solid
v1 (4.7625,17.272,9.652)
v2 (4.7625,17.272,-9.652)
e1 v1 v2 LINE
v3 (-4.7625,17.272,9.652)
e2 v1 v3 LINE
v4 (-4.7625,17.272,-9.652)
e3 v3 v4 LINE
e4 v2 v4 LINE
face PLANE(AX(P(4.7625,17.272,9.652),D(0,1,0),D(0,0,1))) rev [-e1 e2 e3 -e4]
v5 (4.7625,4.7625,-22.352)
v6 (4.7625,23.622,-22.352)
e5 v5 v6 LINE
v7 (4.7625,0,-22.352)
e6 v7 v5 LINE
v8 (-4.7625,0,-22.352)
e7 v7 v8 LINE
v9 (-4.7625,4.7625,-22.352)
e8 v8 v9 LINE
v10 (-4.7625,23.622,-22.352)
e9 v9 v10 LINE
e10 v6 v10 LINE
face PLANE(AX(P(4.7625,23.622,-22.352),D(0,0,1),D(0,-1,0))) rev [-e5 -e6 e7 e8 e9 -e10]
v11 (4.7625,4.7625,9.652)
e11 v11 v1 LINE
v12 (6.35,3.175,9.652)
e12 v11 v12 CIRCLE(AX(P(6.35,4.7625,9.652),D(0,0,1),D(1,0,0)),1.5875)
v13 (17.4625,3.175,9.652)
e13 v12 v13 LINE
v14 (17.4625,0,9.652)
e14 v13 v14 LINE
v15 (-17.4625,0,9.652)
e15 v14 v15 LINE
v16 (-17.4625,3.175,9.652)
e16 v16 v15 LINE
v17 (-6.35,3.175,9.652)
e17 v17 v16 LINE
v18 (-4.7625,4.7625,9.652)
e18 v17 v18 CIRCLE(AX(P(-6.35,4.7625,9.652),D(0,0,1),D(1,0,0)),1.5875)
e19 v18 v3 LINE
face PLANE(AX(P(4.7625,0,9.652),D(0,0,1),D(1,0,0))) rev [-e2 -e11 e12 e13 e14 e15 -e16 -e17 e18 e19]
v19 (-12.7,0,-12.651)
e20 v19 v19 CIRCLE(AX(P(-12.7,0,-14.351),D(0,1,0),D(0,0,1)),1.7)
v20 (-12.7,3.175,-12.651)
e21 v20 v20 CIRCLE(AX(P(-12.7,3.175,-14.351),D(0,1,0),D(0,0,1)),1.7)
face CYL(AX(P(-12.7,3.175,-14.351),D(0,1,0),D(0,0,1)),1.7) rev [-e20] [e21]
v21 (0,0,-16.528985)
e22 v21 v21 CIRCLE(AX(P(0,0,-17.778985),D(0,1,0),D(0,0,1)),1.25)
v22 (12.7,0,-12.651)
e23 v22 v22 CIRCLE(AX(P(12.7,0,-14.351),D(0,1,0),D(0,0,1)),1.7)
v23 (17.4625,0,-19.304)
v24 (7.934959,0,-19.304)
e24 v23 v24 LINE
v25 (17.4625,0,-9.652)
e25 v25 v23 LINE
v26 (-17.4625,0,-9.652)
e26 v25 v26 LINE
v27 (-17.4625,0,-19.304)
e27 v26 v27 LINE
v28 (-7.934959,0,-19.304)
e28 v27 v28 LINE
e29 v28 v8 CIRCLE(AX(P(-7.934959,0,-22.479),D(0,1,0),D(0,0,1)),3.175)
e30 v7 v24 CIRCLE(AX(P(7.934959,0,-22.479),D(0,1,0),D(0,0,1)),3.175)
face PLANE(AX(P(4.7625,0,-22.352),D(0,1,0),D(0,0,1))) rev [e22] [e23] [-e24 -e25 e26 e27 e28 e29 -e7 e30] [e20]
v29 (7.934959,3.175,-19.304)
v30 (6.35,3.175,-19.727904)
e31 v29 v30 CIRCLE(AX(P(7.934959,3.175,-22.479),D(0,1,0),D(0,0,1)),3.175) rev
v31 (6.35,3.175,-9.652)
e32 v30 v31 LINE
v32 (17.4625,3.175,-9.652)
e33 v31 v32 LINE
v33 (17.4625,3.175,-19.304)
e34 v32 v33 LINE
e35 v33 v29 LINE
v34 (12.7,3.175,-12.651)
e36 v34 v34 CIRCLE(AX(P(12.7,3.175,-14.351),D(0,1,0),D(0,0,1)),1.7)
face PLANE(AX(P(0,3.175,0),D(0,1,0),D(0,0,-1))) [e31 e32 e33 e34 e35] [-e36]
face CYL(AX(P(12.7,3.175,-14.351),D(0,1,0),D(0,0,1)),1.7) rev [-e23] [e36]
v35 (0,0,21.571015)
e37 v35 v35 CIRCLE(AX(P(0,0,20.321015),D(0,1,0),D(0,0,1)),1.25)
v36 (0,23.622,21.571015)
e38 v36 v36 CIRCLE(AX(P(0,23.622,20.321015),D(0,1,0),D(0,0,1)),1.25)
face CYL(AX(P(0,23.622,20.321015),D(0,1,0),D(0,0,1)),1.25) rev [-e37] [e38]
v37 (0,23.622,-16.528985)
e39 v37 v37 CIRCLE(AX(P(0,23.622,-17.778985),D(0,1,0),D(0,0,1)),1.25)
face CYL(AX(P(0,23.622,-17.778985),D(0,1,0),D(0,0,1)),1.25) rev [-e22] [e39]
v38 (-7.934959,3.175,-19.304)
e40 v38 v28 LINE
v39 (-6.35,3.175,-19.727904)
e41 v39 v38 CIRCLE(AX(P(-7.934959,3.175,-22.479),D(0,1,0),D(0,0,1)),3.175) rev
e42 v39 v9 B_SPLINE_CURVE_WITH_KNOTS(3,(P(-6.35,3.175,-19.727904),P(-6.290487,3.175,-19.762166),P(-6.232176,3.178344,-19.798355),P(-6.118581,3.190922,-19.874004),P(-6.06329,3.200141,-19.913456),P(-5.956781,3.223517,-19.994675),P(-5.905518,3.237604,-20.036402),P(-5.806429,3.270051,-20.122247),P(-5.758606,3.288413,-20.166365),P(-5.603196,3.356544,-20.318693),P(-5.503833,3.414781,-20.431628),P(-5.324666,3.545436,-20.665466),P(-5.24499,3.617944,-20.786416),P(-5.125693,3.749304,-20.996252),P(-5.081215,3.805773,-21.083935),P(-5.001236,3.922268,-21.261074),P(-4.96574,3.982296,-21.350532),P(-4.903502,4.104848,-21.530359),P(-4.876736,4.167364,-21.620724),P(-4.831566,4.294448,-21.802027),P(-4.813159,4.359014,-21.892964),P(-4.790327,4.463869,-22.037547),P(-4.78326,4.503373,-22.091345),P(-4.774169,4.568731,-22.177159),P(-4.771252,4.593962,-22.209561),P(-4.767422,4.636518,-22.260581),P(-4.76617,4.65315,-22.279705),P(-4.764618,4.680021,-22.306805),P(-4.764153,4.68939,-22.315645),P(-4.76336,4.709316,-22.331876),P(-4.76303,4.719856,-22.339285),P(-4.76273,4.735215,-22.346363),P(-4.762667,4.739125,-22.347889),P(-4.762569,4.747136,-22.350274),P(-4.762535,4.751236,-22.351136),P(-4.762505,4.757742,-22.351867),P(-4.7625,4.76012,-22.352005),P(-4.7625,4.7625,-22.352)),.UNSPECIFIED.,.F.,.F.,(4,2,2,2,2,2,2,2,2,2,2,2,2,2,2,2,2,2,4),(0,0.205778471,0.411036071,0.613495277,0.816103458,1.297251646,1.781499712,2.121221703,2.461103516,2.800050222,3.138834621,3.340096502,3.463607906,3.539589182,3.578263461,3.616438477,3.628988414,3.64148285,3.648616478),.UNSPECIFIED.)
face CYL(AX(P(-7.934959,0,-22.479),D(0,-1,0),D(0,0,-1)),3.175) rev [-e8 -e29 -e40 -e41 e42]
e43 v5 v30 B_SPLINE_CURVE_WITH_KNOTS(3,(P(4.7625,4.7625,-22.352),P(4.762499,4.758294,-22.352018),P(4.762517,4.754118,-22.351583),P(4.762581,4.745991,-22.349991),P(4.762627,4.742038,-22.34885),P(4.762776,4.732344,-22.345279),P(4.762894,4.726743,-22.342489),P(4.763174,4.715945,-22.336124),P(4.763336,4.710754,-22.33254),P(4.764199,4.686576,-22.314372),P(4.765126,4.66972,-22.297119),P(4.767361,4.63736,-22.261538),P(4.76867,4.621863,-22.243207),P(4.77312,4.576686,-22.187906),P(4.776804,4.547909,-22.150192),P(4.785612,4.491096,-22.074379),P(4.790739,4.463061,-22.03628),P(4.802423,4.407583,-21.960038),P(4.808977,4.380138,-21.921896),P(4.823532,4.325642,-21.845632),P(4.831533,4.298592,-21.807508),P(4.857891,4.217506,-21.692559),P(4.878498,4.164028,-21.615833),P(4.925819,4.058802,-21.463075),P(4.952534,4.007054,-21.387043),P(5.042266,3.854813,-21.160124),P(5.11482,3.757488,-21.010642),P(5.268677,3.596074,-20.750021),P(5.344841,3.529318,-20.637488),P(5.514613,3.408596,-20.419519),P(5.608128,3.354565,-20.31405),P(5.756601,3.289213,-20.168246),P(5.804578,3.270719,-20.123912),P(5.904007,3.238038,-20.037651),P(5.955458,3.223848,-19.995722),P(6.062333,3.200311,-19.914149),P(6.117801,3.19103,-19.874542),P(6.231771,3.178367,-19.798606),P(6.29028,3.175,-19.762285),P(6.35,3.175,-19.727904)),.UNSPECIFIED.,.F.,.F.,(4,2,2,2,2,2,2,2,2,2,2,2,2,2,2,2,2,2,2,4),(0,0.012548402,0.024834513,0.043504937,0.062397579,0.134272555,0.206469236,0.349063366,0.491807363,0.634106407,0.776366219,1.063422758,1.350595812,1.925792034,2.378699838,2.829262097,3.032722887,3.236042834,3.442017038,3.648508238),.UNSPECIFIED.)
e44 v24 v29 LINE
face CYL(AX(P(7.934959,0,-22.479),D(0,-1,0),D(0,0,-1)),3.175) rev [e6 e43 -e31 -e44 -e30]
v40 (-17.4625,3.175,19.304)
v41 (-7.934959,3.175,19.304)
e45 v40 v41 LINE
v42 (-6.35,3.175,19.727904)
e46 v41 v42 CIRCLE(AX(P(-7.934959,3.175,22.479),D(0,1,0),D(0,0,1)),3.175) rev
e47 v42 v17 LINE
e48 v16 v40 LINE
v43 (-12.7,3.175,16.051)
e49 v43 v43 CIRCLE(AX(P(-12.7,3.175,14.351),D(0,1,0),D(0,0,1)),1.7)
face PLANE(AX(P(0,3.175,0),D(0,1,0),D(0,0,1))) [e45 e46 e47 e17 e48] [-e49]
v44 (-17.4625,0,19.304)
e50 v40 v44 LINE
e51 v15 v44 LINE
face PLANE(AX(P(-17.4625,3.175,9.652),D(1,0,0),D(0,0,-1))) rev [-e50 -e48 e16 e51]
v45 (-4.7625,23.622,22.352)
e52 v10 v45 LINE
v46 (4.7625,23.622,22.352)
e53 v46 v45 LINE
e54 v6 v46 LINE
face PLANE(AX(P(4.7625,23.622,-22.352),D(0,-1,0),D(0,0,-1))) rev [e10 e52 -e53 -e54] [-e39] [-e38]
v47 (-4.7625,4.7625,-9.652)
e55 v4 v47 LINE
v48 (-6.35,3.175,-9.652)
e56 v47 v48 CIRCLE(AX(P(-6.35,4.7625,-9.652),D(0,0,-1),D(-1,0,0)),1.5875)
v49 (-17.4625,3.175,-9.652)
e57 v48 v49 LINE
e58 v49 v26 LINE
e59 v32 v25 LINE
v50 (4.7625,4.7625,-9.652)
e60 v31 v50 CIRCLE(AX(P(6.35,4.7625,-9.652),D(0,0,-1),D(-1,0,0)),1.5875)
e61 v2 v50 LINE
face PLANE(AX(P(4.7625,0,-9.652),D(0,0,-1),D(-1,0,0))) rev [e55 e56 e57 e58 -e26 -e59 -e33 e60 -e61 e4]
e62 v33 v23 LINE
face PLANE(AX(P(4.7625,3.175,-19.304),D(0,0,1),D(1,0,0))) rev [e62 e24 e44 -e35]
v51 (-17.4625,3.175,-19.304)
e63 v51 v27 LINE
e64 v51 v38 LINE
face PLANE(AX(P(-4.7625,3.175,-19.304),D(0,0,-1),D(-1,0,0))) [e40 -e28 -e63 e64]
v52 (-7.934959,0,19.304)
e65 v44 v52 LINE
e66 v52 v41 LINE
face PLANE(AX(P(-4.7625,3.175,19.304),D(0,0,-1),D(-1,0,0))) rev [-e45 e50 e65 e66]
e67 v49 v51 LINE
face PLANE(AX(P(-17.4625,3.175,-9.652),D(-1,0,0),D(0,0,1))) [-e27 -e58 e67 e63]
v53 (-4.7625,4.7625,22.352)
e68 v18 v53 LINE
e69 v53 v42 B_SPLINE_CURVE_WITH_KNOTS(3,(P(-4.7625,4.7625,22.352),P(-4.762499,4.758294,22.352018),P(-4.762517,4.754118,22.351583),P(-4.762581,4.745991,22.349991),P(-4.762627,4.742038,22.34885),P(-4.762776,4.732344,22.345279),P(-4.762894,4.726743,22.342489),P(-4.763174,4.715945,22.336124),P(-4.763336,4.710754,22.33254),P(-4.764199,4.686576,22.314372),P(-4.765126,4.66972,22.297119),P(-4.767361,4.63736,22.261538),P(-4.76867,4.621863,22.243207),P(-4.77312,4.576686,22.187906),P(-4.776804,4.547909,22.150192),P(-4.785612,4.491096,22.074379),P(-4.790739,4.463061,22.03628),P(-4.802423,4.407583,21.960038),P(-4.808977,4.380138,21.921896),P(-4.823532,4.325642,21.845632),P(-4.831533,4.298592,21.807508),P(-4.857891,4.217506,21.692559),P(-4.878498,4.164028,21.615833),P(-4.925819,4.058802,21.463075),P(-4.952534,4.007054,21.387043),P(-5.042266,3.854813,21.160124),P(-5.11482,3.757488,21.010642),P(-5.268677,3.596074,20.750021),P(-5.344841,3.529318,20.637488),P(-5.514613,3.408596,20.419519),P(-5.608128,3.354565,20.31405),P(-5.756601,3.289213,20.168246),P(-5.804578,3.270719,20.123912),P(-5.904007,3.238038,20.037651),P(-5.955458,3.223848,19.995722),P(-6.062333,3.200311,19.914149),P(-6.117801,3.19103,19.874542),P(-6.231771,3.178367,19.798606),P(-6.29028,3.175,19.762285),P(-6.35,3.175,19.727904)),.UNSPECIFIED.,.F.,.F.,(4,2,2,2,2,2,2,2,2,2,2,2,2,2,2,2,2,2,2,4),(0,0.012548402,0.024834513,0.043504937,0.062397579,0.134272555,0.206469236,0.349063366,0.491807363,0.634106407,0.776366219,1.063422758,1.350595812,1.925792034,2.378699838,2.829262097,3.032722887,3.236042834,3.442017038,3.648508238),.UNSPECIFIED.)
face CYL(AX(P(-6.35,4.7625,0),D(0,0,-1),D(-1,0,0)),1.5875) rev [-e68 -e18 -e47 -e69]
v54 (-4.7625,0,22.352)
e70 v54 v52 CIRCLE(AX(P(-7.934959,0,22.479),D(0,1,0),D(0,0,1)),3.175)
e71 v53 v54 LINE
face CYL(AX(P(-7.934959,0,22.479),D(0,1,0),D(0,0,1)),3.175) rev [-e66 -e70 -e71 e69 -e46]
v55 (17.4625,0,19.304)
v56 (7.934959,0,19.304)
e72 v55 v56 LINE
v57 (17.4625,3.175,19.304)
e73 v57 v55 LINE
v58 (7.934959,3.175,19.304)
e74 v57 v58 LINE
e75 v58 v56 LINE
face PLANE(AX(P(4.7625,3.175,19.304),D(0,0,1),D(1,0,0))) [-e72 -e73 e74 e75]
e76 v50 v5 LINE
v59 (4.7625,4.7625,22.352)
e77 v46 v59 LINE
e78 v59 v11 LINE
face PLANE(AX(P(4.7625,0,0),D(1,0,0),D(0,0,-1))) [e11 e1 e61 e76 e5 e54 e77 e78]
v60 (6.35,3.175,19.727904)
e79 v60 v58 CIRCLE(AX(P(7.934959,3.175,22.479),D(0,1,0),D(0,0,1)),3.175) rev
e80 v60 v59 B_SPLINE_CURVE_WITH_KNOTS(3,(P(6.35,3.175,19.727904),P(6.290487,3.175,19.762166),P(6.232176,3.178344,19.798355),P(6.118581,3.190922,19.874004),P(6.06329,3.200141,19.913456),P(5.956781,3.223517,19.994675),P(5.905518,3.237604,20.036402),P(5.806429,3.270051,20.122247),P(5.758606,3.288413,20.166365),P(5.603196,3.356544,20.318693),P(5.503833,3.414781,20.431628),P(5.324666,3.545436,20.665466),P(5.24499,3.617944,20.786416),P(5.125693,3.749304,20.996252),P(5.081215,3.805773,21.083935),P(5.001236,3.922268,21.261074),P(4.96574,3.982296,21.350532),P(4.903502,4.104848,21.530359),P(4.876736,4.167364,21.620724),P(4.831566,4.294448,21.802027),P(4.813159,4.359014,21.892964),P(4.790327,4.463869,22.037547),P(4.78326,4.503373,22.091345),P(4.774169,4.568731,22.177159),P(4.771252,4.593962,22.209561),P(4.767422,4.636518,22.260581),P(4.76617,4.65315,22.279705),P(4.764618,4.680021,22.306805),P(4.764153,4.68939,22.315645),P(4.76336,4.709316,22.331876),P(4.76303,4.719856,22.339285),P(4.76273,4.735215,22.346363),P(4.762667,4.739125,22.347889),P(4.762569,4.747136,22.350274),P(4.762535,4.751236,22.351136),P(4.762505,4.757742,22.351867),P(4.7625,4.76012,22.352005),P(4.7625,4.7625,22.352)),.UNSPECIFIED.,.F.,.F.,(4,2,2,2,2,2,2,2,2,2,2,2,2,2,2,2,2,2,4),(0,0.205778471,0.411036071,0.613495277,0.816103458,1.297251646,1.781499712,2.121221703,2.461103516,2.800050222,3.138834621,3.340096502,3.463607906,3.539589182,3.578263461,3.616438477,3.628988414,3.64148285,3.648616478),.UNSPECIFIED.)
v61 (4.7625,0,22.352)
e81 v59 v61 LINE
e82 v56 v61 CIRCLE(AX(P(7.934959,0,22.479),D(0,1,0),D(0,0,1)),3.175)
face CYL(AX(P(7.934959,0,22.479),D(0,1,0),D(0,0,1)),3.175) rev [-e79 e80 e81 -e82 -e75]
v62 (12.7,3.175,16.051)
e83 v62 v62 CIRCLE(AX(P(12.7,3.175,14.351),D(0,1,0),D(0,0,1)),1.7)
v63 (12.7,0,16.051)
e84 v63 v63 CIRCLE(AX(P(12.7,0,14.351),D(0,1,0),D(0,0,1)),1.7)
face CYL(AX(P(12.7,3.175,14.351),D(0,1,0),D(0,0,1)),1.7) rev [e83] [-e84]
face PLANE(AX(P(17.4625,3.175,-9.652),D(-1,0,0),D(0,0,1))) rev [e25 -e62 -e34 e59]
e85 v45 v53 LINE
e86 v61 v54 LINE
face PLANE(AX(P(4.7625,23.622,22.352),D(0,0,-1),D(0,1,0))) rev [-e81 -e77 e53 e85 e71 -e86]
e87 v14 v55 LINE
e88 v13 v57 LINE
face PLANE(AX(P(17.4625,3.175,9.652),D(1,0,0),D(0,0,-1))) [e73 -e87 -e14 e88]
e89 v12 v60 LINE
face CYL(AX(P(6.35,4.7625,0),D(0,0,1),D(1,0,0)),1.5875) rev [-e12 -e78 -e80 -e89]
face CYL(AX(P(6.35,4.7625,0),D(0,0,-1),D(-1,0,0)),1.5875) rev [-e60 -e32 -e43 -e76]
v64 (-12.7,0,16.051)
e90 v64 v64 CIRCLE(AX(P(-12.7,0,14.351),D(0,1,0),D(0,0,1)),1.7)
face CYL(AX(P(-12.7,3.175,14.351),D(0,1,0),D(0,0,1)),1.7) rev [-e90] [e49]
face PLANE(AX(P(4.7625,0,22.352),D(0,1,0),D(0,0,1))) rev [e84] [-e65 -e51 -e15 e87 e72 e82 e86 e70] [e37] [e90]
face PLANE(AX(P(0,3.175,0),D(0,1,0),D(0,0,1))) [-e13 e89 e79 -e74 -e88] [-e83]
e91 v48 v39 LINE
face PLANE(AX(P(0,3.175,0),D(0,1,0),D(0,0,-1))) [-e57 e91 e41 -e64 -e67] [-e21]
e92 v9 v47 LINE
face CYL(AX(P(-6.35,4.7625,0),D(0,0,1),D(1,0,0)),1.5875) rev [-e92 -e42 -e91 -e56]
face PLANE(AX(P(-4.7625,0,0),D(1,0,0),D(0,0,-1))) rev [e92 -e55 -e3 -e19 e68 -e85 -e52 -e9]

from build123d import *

# Parameters (mm, degrees)
BOSS_EXTRUDE1_DEPTH         = 4.7625
SKETCH4_W                   = 12.7
SKETCH4_H                   = 9.652
BOSS_EXTRUDE2_DEPTH         = 3.175
M3_CLEARANCE_HOLE1_D        = 3.4
MIRROR2_COPY_1_SKETCH_W     = 12.7
MIRROR2_COPY_1_SKETCH_H     = 9.652
MIRROR2_COPY_1_DEPTH        = 3.175
MIRROR2_COPY_2_D            = 3.4
FILLET1_R                   = 3.175
FILLET2_R                   = 1.5875
TAP_DRILL_FOR_M3X0_5_TAP1_D = 2.5


with BuildPart() as part:
    # Sketch2 → Boss-Extrude1 (new, symmetric)
    with BuildSketch(Plane(origin=(0, 0, 0), x_dir=(0, 0, -1), z_dir=(1, 0, 0))):
        Polygon((22.352, 23.622), (-22.352, 23.622), (-22.352, 0), (-9.652, 0), (-9.652, 17.272), (9.652, 17.272), (9.652, 0), (22.352, 0), align=None)
    extrude(amount=BOSS_EXTRUDE1_DEPTH, both=True)

    # Sketch4 → Boss-Extrude2 (add)
    with BuildSketch(Plane.XZ):
        with Locations((11.1125, 14.478)):
            Rectangle(SKETCH4_W, SKETCH4_H)
    boss_extrude2 = extrude(amount=-BOSS_EXTRUDE2_DEPTH)

    # M3 Clearance Hole1 (through all)
    with Locations(Plane(origin=(0, 3.175, 0), x_dir=(1, 0, 0), z_dir=(0, 1, 0))):
        with Locations((12.7, -14.351)):
            m3_clearance_hole1 = Hole(M3_CLEARANCE_HOLE1_D / 2)

    # Mirror1: Boss-Extrude2, M3 Clearance Hole1 across plane
    add(boss_extrude2.mirror(Plane.XY))
    add(m3_clearance_hole1.mirror(Plane.XY), mode=Mode.SUBTRACT)

    # Mirror2: Boss-Extrude2, M3 Clearance Hole1 across plane
    add(boss_extrude2.mirror(Plane(origin=(0, 0, 0), x_dir=(0, 0, 1), z_dir=(1, 0, 0))))
    add(m3_clearance_hole1.mirror(Plane(origin=(0, 0, 0), x_dir=(0, 0, 1), z_dir=(1, 0, 0))), mode=Mode.SUBTRACT)

    # Mirror2 copy 1 sketch → Mirror2 copy 1 (add)
    with BuildSketch(Plane(origin=(0, 0, 0), x_dir=(-1, 0, 0), z_dir=(0, -1, 0))):
        with Locations((11.1125, 14.478)):
            Rectangle(MIRROR2_COPY_1_SKETCH_W, MIRROR2_COPY_1_SKETCH_H)
    extrude(amount=-MIRROR2_COPY_1_DEPTH)

    # Mirror2 copy 2 (through all)
    with Locations(Plane(origin=(0, 3.175, 0), x_dir=(-1, 0, 0), z_dir=(0, 1, 0))):
        with Locations((12.7, -14.351)):
            Hole(MIRROR2_COPY_2_D / 2)

    # Fillet1
    # the kernel refuses this fillet: 3.175 mm, written as the material it adds along each edge
    with BuildSketch(Plane(origin=(-4.7625, 0, -19.304), x_dir=(0, 0, -1), z_dir=(0, 1, 0)), Plane(origin=(4.7625, 0, 19.304), x_dir=(0, 0, 1), z_dir=(0, 1, 0))) as fillet1_piece_1:
        with BuildLine():
            CenterArc((3.175, 3.172458983), FILLET1_R, 180, 87.707557224)
            Line((0, 3.172458983), (-0.0635, 3.172458983))
            Line((-0.0635, 3.172458983), (-0.0635, 0))
            Line((-0.0635, 0), (0, -0.0635))
            ThreePointArc((0, -0.0635), (1.524, -0.0635), (3.04546, -0.06344918))
            Line((3.04546, -0.06344918), (3.048, 0))
        make_face()
    extrude(amount=3.175)
    with BuildSketch(Plane(origin=(4.7625, 0, -19.304), x_dir=(0, 0, -1), z_dir=(0, 1, 0)), Plane(origin=(-4.7625, 0, 19.304), x_dir=(0, 0, 1), z_dir=(0, 1, 0))) as fillet1_piece_2:
        with BuildLine():
            CenterArc((3.175, -3.172458983), FILLET1_R, 92.292442776, 87.707557224)
            Line((0, -3.172458983), (-0.0635, -3.172458983))
            Line((-0.0635, -3.172458983), (-0.0635, 0))
            Line((-0.0635, 0), (0, 0.0635))
            ThreePointArc((0, 0.0635), (1.524, 0.0635), (3.04546, 0.06344918))
            Line((3.04546, 0.06344918), (3.048, 0))
        make_face()
    extrude(amount=3.175)

    # Fillet2
    # the kernel refuses this fillet: 1.5875 mm, written as the material it adds along each edge
    with BuildSketch(Plane(origin=(4.7625, 3.175, 22.352), x_dir=(1, 0, 0), z_dir=(0, 0, -1))) as fillet2_piece_1_section:
        with BuildLine():
            CenterArc((FILLET2_R, -FILLET2_R), FILLET2_R, 90, 90)
            Line((0, -FILLET2_R), (0, 0))
            Line((0, 0), (FILLET2_R, 0))
        make_face()
    fillet2_piece_1 = extrude(amount=12.7, mode=Mode.PRIVATE)
    fillet2_piece_1 = fillet2_piece_1 - Plane(origin=(7.934958983, 3.539048881, 22.479), x_dir=(0, 0, 1), z_dir=(0, -1, 0)) * Cylinder(3.175, 32, mode=Mode.PRIVATE)
    add(fillet2_piece_1)
    with BuildSketch(Plane(origin=(4.7625, 3.175, -22.352), x_dir=(1, 0, 0), z_dir=(0, 0, 1))) as fillet2_piece_2_section:
        with BuildLine():
            CenterArc((FILLET2_R, FILLET2_R), FILLET2_R, 180, 90)
            Line((0, FILLET2_R), (0, 0))
            Line((0, 0), (FILLET2_R, 0))
        make_face()
    fillet2_piece_2 = extrude(amount=12.7, mode=Mode.PRIVATE)
    fillet2_piece_2 = fillet2_piece_2 - Plane(origin=(7.934958983, 3.539054825, -22.479), x_dir=(0, 0, -1), z_dir=(0, -1, 0)) * Cylinder(3.175, 32, mode=Mode.PRIVATE)
    add(fillet2_piece_2)
    with BuildSketch(Plane(origin=(-4.7625, 3.175, 9.652), x_dir=(0, 1, 0), z_dir=(0, 0, 1))) as fillet2_piece_3_section:
        with BuildLine():
            CenterArc((FILLET2_R, FILLET2_R), FILLET2_R, 180, 90)
            Line((0, FILLET2_R), (0, 0))
            Line((0, 0), (FILLET2_R, 0))
        make_face()
    fillet2_piece_3 = extrude(amount=12.7, mode=Mode.PRIVATE)
    fillet2_piece_3 = fillet2_piece_3 - Plane(origin=(-7.934958983, 3.539056273, 22.479), x_dir=(0, 0, 1), z_dir=(0, -1, 0)) * Cylinder(3.175, 32, mode=Mode.PRIVATE)
    add(fillet2_piece_3)
    with BuildSketch(Plane(origin=(-4.7625, 3.175, -9.652), x_dir=(-1, 0, 0), z_dir=(0, 0, -1))) as fillet2_piece_4_section:
        with BuildLine():
            CenterArc((FILLET2_R, FILLET2_R), FILLET2_R, 180, 90)
            Line((0, FILLET2_R), (0, 0))
            Line((0, 0), (FILLET2_R, 0))
        make_face()
    fillet2_piece_4 = extrude(amount=12.7, mode=Mode.PRIVATE)
    fillet2_piece_4 = fillet2_piece_4 - Plane(origin=(-7.934958983, 3.539048881, -22.479), x_dir=(0, 0, -1), z_dir=(0, -1, 0)) * Cylinder(3.175, 32, mode=Mode.PRIVATE)
    add(fillet2_piece_4)

    # Tap Drill for M3x0.5 Tap1 (through all)
    with Locations(Plane(origin=(0, 23.622, 0), x_dir=(1, 0, 0), z_dir=(0, 1, 0))):
        with Locations((0, 17.778984556), (0, -20.321015444)):
            Hole(TAP_DRILL_FOR_M3X0_5_TAP1_D / 2)


solid = part.part
